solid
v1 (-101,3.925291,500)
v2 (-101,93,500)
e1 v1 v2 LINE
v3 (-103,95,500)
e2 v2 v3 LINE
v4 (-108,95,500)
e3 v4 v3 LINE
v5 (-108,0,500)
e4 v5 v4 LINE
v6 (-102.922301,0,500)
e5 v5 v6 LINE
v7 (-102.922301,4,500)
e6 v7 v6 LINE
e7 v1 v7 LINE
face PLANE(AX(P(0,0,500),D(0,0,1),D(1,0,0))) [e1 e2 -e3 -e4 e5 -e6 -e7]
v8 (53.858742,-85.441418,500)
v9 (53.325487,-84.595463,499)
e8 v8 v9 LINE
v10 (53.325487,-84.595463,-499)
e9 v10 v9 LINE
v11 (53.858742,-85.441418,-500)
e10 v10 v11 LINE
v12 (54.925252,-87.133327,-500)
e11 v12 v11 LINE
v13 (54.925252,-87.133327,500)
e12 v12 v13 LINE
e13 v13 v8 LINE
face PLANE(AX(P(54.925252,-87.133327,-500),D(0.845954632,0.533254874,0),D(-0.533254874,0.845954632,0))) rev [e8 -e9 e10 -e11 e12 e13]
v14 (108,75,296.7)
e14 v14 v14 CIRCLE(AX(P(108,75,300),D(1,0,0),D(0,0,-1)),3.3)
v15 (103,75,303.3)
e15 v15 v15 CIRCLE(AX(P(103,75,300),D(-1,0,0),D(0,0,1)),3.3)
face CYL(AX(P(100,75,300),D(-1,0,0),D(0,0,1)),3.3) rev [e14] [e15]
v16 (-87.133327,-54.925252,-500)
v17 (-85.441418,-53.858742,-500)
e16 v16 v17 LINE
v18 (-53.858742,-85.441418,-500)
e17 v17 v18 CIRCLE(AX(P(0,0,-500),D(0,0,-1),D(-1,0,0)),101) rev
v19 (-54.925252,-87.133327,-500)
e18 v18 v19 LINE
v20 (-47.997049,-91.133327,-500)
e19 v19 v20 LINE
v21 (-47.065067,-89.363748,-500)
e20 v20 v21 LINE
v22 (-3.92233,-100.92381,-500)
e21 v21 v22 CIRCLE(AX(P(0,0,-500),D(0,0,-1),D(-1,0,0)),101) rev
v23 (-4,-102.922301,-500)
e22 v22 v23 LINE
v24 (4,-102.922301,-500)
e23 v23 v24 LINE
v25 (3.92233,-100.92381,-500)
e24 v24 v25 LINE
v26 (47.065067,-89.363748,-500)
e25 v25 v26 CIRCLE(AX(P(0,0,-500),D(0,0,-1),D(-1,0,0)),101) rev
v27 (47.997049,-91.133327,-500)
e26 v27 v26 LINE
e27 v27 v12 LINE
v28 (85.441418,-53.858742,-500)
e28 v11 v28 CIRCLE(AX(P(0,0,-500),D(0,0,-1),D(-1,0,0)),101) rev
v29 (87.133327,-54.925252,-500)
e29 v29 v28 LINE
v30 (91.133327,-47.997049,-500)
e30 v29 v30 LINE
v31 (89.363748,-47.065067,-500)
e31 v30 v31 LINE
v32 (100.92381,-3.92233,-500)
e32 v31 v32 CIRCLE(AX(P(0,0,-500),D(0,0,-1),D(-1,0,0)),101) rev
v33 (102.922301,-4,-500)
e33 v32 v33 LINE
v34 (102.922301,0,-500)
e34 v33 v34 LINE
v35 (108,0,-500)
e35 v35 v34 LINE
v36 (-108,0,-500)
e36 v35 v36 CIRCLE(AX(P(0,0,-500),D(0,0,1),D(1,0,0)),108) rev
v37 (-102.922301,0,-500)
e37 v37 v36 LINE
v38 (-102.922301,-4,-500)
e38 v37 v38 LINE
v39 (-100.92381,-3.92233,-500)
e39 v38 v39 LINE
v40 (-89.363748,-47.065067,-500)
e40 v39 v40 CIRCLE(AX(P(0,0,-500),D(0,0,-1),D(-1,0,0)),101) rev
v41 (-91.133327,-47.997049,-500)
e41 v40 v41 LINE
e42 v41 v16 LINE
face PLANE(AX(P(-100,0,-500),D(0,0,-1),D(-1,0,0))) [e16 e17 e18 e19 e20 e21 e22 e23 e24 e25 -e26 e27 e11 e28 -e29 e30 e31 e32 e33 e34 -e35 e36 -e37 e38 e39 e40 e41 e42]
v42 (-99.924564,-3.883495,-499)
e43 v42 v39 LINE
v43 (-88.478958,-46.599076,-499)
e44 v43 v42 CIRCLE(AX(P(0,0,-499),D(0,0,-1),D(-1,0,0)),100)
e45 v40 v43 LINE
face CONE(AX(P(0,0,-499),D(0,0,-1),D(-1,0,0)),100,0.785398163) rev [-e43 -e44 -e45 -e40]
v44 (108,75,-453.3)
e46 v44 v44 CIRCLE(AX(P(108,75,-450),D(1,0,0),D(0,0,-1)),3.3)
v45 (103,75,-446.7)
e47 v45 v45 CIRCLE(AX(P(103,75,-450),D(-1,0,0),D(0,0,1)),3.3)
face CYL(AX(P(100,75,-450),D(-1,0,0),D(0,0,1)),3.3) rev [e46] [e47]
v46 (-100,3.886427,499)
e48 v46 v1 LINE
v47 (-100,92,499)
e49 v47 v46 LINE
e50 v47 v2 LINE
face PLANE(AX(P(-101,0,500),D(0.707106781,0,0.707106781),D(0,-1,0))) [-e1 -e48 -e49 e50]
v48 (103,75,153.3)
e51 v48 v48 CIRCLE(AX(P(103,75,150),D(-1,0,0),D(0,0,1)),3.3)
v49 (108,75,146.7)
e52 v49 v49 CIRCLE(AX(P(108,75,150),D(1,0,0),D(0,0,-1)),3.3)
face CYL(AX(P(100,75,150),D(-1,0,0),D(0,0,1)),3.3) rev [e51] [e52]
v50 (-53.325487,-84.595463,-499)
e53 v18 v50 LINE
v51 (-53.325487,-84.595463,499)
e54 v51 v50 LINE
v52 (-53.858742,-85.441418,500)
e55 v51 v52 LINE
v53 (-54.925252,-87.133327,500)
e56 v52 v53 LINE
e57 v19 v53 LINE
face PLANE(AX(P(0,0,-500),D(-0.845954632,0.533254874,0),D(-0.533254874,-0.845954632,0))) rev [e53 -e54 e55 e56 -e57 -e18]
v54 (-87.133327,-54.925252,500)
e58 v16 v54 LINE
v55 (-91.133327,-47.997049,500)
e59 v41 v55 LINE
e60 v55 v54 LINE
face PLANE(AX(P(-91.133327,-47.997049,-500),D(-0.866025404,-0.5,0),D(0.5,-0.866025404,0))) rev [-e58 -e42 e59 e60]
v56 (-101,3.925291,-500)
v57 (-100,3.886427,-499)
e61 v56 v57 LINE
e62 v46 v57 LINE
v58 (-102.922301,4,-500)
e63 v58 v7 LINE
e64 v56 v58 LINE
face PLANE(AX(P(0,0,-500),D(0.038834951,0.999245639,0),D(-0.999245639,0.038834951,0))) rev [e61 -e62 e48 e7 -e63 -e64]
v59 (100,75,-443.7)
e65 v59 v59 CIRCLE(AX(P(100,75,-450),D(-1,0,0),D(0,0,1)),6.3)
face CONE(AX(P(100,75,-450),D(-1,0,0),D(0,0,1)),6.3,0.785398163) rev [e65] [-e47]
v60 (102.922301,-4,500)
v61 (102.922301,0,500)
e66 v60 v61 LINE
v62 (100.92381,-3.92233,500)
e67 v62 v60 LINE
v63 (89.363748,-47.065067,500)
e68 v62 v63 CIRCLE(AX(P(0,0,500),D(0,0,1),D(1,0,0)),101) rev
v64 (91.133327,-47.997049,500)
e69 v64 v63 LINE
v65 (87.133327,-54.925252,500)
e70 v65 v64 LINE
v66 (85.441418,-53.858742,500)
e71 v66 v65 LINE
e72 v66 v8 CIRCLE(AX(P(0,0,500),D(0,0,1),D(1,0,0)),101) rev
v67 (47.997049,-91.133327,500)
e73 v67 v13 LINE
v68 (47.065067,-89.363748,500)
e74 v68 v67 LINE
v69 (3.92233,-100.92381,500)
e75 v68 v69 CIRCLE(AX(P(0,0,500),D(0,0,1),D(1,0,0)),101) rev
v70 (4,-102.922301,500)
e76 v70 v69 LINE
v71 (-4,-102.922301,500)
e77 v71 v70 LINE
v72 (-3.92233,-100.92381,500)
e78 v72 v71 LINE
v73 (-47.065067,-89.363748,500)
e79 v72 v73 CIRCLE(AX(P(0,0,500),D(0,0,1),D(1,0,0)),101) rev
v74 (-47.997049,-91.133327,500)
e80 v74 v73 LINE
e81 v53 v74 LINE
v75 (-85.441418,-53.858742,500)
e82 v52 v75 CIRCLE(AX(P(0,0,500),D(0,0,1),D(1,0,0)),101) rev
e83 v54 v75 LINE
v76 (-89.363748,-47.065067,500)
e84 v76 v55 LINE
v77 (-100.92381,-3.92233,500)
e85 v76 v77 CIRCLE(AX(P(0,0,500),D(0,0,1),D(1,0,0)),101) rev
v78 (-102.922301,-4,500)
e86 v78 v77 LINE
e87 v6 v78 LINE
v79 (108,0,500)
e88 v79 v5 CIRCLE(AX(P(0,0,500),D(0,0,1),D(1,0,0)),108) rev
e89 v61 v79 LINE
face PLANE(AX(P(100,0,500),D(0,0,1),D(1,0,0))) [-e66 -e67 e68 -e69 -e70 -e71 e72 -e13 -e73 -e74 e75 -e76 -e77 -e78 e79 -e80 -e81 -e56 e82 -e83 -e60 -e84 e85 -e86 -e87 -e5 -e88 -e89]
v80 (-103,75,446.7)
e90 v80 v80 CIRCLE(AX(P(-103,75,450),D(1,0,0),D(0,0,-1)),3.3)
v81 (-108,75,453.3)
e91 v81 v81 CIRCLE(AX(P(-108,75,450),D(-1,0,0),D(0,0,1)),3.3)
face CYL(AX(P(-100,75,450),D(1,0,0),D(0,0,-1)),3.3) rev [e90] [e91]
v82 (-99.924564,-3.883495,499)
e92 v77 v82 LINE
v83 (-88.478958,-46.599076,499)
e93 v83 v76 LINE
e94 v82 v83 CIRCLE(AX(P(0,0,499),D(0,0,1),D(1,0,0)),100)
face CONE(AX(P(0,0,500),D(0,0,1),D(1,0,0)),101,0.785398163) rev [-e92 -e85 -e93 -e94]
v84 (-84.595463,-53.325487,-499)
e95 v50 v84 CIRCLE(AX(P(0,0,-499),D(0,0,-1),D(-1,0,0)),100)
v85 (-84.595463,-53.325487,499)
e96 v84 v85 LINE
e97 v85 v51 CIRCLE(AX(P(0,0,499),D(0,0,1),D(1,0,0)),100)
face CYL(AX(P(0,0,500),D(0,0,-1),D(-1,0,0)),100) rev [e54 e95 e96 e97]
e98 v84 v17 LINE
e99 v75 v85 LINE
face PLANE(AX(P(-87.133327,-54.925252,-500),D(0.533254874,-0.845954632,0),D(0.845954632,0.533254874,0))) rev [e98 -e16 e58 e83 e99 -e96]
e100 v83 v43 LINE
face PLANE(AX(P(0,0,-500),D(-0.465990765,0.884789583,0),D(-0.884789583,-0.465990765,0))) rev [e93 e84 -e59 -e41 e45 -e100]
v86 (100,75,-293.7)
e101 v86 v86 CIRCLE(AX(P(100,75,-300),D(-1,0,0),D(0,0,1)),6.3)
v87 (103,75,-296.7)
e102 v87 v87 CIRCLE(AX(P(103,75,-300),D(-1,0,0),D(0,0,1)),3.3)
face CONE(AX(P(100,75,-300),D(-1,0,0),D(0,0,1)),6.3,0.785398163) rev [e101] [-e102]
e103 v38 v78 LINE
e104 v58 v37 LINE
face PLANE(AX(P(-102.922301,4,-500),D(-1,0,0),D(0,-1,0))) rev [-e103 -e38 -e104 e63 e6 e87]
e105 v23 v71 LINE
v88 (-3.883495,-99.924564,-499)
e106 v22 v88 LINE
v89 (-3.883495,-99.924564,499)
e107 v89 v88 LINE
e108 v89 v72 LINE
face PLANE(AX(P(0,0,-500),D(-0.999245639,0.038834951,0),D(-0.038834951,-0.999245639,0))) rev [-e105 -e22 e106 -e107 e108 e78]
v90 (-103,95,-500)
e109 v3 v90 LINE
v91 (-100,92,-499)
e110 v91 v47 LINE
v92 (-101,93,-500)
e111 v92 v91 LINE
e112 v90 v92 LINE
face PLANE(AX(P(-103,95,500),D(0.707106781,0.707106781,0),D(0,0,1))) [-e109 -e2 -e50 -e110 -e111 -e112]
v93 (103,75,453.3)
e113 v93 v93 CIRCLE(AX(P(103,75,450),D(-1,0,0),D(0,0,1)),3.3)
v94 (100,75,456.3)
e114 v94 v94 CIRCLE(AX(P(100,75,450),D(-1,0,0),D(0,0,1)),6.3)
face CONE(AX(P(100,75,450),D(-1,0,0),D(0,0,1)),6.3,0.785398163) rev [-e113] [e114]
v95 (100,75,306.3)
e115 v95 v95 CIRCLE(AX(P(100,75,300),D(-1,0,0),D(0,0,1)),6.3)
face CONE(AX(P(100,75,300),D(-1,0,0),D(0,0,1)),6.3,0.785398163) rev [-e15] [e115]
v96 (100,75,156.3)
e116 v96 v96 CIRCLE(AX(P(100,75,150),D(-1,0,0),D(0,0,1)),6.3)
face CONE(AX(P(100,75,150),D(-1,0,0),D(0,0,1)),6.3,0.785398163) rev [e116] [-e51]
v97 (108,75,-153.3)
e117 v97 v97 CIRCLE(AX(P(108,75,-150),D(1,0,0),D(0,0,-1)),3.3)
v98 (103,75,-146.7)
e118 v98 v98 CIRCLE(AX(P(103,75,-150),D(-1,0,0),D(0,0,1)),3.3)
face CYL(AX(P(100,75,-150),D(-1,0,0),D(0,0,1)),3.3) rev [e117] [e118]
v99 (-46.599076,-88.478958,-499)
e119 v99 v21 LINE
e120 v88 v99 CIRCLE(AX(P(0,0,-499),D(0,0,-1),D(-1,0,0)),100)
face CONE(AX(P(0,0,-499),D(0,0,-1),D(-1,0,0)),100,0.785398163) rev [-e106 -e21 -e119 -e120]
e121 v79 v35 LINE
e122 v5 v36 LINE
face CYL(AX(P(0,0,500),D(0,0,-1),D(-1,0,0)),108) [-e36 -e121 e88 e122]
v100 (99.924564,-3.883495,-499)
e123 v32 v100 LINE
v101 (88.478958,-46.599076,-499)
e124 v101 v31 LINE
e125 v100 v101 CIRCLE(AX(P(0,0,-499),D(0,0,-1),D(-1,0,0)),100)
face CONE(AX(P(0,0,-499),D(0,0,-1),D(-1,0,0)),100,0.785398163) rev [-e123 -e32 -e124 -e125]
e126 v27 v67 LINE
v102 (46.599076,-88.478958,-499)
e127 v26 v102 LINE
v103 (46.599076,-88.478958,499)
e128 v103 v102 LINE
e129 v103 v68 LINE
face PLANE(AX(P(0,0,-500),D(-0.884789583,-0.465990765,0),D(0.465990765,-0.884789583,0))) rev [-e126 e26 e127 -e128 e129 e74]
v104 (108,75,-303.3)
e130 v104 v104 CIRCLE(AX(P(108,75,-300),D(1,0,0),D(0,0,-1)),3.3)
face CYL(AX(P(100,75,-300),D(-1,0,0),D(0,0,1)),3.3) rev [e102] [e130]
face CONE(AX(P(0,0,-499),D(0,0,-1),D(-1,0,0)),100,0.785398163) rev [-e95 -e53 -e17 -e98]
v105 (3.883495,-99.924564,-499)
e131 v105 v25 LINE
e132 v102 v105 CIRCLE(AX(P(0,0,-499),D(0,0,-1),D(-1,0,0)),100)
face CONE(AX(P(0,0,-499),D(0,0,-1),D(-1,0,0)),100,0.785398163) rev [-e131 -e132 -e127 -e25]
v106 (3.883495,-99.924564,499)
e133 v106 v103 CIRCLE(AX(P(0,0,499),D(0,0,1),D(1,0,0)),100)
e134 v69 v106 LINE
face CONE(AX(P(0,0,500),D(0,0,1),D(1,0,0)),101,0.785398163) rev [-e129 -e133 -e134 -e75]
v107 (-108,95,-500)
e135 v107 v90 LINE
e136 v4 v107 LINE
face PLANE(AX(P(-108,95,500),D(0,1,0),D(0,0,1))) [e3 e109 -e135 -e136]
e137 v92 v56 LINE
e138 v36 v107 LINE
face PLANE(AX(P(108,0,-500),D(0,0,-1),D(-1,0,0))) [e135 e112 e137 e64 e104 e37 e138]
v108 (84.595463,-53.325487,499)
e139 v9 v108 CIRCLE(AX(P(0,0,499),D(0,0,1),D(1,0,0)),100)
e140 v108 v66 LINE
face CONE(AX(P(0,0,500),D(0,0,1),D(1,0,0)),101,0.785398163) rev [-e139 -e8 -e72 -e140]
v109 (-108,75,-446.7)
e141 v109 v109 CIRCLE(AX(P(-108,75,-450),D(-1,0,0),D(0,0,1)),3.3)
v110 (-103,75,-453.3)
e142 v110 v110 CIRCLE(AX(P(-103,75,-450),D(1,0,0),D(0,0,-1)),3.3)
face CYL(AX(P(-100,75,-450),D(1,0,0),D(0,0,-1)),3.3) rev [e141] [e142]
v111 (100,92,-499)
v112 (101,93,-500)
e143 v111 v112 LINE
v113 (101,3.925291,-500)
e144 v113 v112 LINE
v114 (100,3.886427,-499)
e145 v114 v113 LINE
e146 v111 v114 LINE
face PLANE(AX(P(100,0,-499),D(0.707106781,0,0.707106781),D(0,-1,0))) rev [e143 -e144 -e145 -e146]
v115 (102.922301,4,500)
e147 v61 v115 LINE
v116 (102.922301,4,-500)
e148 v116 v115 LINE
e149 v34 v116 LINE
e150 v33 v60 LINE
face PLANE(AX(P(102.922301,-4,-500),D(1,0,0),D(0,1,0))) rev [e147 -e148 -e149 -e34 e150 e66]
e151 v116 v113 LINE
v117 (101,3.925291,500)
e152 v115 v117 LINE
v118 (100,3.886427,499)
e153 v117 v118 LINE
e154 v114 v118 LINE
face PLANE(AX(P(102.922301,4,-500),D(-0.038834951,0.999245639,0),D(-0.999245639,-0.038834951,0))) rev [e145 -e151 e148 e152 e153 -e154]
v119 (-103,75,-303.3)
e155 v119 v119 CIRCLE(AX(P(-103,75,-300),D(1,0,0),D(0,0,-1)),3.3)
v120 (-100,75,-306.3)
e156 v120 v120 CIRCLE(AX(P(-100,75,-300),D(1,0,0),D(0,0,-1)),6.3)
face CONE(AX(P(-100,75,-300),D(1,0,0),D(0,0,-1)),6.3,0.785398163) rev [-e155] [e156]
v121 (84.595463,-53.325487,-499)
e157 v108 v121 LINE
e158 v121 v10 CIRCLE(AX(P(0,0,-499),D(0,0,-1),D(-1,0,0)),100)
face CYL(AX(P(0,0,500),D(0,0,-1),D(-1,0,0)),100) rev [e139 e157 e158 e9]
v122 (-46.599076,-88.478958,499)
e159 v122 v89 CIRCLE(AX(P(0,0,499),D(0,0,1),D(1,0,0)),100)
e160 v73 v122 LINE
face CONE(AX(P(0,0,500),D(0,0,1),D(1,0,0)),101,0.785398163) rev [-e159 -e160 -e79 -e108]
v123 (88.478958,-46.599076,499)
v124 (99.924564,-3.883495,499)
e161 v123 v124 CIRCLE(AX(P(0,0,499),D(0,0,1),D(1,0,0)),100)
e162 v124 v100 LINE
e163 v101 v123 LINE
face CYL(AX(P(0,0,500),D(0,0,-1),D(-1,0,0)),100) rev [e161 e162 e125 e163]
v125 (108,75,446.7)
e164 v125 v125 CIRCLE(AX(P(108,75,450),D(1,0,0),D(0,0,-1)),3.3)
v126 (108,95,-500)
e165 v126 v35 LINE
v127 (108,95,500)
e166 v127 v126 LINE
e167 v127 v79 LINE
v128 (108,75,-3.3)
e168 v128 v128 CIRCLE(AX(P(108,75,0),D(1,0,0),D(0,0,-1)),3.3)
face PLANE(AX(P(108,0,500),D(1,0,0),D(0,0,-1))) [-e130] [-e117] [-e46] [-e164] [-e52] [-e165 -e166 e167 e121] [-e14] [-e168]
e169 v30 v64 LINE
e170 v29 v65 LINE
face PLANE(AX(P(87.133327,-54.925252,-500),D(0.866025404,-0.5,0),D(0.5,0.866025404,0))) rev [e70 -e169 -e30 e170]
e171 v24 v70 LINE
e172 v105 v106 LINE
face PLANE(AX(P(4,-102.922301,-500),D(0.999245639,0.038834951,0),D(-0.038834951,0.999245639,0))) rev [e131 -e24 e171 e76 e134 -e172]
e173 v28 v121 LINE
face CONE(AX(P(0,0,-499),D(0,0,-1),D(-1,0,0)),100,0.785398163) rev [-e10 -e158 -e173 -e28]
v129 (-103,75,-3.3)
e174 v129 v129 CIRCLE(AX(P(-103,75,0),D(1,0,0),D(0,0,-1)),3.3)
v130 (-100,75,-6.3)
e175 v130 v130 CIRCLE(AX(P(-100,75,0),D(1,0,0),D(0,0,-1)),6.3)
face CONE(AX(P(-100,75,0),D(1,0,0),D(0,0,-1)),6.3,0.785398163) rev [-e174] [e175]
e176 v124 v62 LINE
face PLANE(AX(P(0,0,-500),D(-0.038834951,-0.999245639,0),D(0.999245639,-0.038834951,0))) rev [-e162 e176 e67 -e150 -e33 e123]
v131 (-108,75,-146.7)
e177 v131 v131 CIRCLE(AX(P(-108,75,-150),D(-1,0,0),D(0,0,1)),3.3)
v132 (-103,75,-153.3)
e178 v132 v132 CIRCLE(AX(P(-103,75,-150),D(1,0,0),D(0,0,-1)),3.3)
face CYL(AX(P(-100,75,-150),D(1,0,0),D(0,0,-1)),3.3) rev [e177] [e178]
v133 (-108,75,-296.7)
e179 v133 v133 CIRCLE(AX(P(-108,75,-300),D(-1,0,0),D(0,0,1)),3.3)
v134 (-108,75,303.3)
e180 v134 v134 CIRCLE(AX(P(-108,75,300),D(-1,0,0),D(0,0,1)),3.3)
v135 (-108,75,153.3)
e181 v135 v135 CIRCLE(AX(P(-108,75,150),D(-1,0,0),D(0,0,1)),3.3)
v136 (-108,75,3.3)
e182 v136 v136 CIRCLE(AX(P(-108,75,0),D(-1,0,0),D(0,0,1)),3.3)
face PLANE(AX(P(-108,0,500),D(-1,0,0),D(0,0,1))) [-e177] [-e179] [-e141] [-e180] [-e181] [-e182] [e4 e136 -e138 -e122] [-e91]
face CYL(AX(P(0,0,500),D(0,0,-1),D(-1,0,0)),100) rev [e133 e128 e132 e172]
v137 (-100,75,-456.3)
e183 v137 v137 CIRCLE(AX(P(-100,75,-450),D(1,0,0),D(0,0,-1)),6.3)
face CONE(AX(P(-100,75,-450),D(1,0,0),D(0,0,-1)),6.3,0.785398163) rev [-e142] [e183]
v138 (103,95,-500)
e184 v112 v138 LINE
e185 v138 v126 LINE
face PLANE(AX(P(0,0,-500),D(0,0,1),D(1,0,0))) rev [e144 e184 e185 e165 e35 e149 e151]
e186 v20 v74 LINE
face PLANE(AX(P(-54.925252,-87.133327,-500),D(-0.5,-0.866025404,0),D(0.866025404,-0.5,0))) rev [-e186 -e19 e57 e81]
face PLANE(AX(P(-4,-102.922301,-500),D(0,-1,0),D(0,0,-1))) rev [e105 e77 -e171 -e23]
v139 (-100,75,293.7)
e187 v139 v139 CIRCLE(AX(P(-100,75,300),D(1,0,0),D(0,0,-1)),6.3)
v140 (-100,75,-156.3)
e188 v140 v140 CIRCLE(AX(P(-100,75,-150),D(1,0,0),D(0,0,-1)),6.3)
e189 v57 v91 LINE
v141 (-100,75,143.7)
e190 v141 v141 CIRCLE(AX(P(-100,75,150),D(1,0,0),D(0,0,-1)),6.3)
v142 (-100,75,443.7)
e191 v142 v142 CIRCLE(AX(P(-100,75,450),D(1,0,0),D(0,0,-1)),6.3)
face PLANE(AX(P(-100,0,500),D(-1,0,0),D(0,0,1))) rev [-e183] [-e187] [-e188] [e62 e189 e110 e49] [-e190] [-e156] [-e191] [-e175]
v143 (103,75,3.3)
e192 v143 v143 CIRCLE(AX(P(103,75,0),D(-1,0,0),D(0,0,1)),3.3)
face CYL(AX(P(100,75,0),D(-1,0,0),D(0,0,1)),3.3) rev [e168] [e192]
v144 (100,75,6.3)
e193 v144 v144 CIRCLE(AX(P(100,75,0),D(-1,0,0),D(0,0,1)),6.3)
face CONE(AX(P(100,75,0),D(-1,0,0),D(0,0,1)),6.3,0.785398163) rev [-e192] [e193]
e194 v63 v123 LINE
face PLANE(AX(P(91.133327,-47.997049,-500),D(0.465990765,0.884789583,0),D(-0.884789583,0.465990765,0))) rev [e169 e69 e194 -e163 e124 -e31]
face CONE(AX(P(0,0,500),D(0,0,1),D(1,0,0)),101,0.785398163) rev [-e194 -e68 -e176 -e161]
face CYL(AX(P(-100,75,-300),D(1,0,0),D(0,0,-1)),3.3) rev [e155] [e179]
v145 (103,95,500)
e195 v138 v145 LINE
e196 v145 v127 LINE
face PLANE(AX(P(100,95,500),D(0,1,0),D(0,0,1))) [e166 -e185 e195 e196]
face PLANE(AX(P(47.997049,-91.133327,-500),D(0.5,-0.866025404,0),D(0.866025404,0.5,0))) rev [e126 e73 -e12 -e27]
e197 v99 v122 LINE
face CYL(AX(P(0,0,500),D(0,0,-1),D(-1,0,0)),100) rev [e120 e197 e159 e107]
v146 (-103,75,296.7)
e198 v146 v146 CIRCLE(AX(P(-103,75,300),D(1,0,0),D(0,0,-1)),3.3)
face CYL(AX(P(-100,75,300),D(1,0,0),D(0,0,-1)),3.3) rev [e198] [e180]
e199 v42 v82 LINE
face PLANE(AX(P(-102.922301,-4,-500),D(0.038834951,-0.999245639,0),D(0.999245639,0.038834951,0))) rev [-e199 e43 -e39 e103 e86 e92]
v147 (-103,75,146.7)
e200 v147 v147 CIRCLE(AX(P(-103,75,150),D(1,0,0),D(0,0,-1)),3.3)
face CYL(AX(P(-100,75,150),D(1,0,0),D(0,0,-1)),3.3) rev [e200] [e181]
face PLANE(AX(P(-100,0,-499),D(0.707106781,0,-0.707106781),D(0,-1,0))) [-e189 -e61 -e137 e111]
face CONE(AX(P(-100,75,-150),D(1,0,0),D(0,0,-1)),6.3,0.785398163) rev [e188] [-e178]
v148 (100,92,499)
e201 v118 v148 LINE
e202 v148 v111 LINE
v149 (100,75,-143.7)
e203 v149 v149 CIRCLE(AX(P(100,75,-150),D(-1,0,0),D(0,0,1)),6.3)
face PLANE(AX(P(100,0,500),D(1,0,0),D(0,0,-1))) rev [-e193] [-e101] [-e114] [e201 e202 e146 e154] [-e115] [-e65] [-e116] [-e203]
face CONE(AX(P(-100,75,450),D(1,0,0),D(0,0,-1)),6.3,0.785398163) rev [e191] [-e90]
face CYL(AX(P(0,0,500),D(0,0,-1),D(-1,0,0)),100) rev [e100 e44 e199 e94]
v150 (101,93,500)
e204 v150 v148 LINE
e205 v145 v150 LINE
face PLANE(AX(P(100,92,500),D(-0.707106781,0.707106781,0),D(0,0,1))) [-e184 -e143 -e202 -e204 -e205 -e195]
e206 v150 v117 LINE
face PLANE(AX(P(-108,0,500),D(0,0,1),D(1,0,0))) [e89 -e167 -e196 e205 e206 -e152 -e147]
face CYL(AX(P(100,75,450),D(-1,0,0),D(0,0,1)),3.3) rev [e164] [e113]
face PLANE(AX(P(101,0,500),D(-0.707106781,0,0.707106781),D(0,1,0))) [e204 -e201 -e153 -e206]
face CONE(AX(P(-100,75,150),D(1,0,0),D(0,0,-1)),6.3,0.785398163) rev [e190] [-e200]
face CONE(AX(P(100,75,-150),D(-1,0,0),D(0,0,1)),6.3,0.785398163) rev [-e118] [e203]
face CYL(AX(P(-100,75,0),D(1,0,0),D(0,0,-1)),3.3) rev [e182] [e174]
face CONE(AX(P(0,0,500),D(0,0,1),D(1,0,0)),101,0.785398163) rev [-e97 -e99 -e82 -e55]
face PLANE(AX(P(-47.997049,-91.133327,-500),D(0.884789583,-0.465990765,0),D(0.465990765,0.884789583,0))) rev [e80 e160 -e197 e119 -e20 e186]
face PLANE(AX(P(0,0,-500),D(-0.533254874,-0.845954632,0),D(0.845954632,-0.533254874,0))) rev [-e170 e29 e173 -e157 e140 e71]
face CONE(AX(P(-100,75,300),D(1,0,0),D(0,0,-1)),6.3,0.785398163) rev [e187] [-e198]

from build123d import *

# Parameters (mm, degrees)
SM_BASE_FLANGE_1_DEPTH     = 500
CHAMFER_2_SIZE             = 1
CUT_EXTRUDE_1_DEPTH        = 1012.596757607
PATTERN_CIRCULAR_1_COUNT   = 4
PATTERN_CIRCULAR_1_ANGLE   = 90
F_1_THE_OTHER_WAY_COUNT    = 4
F_1_THE_OTHER_WAY_ANGLE    = 90
CHAMFER_1_SIZE             = 3
HOLE_WIZARD_M61_AT_2_COUNT = 2
HOLE_WIZARD_M61_AT_2_PITCH = 150
HOLE_WIZARD_M61_AT_3_COUNT = 2
HOLE_WIZARD_M61_AT_3_PITCH = 300
HOLE_WIZARD_M61_AT_4_COUNT = 2
HOLE_WIZARD_M61_AT_4_PITCH = 450
HOLE_WIZARD_M61_AT_5_COUNT = 2
HOLE_WIZARD_M61_AT_5_PITCH = 600
HOLE_WIZARD_M61_AT_6_COUNT = 2
HOLE_WIZARD_M61_AT_6_PITCH = 750
HOLE_WIZARD_M61_AT_7_COUNT = 2
HOLE_WIZARD_M61_AT_7_PITCH = 900


# Sheet-metal steps are written as plain solids
with BuildPart() as part:
    # Sketch 2 → Базовая кромка1 (new, symmetric)
    with BuildSketch(Plane.XY):
        with BuildLine():
            Line((100, 95), (100, 0))
            ThreePointArc((100, 0), (0, -100), (-100, 0))
            Line((-100, 0), (-100, 95))
            Line((-100, 95), (-108, 95))
            Line((-108, 95), (-108, 0))
            ThreePointArc((-108, 0), (0, -108), (108, 0))
            Line((108, 0), (108, 95))
            Line((108, 95), (100, 95))
        make_face()
    extrude(amount=SM_BASE_FLANGE_1_DEPTH, both=True)

    # Фаска2
    chamfer_2_edges = [part.edges().sort_by_distance(p)[0] for p in [
        (100, 47.5, 500),
        (0, -100, 500),
        (-100, 47.5, 500),
        (0, -100, -500),
        (100, 47.5, -500),
        (-100, 47.5, -500),
    ]]
    chamfer(chamfer_2_edges, length=CHAMFER_2_SIZE)

    # Эскиз7 → Вырез-Вытянуть1 (cut, symmetric)
    with BuildSketch(Plane.XY.offset(500)):
        Polygon((0, 0), (-4, -102.92230079), (4, -102.92230079), align=None)
    cut_extrude_1 = extrude(amount=CUT_EXTRUDE_1_DEPTH, both=True, mode=Mode.SUBTRACT)

    # Круговой массив1: Вырез-Вытянуть1 ×4 about axis
    pattern_circular_1_axis = Axis((0, 0, 0), (0, 0, -1))
    for i in range(1, PATTERN_CIRCULAR_1_COUNT):
        add(cut_extrude_1.rotate(pattern_circular_1_axis, i * PATTERN_CIRCULAR_1_ANGLE / (PATTERN_CIRCULAR_1_COUNT - 1)), mode=Mode.SUBTRACT)

    # 1 the other way: Вырез-Вытянуть1 ×4 about axis
    f_1_the_other_way_axis = Axis((0, 0, 0), (0, 0, 1))
    for i in range(1, F_1_THE_OTHER_WAY_COUNT):
        add(cut_extrude_1.rotate(f_1_the_other_way_axis, i * F_1_THE_OTHER_WAY_ANGLE / (F_1_THE_OTHER_WAY_COUNT - 1)), mode=Mode.SUBTRACT)

    # Фаска1
    chamfer_1_edges = [part.edges().sort_by_distance(p)[0] for p in [
        (100, 95, 0),
        (-100, 95, 0),
    ]]
    chamfer(chamfer_1_edges, length=CHAMFER_1_SIZE)

    # Эскиз9 → Зенковка для винта с полупотайной головкой M61 (revolve, cut)
    with BuildSketch(Plane(origin=(-100, 75, 450), x_dir=(0, 0, -1), z_dir=(0, 1, 0))):
        Polygon((0, 0), (0, 18.982840043), (3.3, 17), (3.3, 3), (6.3, 0), align=None)
    hole_wizard_m61 = revolve(axis=Axis((-93.65, 75, 450), (-1, 0, 0)), mode=Mode.SUBTRACT)

    # Зенковка для винта с полупотайной головкой M61 at 2: Зенковка для винта с полупотайной головкой M61 ×2
    with Locations(*[(0, 0, -i * HOLE_WIZARD_M61_AT_2_PITCH) for i in range(1, HOLE_WIZARD_M61_AT_2_COUNT)]):
        add(hole_wizard_m61, mode=Mode.SUBTRACT)

    # Зенковка для винта с полупотайной головкой M61 at 3: Зенковка для винта с полупотайной головкой M61 ×2
    with Locations(*[(0, 0, -i * HOLE_WIZARD_M61_AT_3_PITCH) for i in range(1, HOLE_WIZARD_M61_AT_3_COUNT)]):
        add(hole_wizard_m61, mode=Mode.SUBTRACT)

    # Зенковка для винта с полупотайной головкой M61 at 4: Зенковка для винта с полупотайной головкой M61 ×2
    with Locations(*[(0, 0, -i * HOLE_WIZARD_M61_AT_4_PITCH) for i in range(1, HOLE_WIZARD_M61_AT_4_COUNT)]):
        add(hole_wizard_m61, mode=Mode.SUBTRACT)

    # Зенковка для винта с полупотайной головкой M61 at 5: Зенковка для винта с полупотайной головкой M61 ×2
    with Locations(*[(0, 0, -i * HOLE_WIZARD_M61_AT_5_PITCH) for i in range(1, HOLE_WIZARD_M61_AT_5_COUNT)]):
        add(hole_wizard_m61, mode=Mode.SUBTRACT)

    # Зенковка для винта с полупотайной головкой M61 at 6: Зенковка для винта с полупотайной головкой M61 ×2
    with Locations(*[(0, 0, -i * HOLE_WIZARD_M61_AT_6_PITCH) for i in range(1, HOLE_WIZARD_M61_AT_6_COUNT)]):
        add(hole_wizard_m61, mode=Mode.SUBTRACT)

    # Зенковка для винта с полупотайной головкой M61 at 7: Зенковка для винта с полупотайной головкой M61 ×2
    with Locations(*[(0, 0, -i * HOLE_WIZARD_M61_AT_7_PITCH) for i in range(1, HOLE_WIZARD_M61_AT_7_COUNT)]):
        add(hole_wizard_m61, mode=Mode.SUBTRACT)

    # Зеркальное отражение1: Зенковка для винта с полупотайной головкой M61 across plane
    add(hole_wizard_m61.mirror(Plane(origin=(0, 0, 0), x_dir=(0, 0, 1), z_dir=(1, 0, 0))), mode=Mode.SUBTRACT)

    # Зеркальное отражение1 copy 1 sketch → Зеркальное отражение1 copy 1 (revolve, cut)
    with BuildSketch(Plane(origin=(100, 75, 300), x_dir=(0, 0, -1), z_dir=(0, 1, 0))):
        Polygon((0, 0), (0, -18.982840043), (3.3, -17), (3.3, -3), (6.3, 0), align=None)
    revolve(axis=Axis((93.65, 75, 300), (-1, 0, 0)), mode=Mode.SUBTRACT)

    # Зеркальное отражение1 copy 2 sketch → Зеркальное отражение1 copy 2 (revolve, cut)
    with BuildSketch(Plane(origin=(100, 75, 150), x_dir=(0, 0, -1), z_dir=(0, 1, 0))):
        Polygon((0, 0), (0, -18.982840043), (3.3, -17), (3.3, -3), (6.3, 0), align=None)
    revolve(axis=Axis((93.65, 75, 150), (-1, 0, 0)), mode=Mode.SUBTRACT)

    # Зеркальное отражение1 copy 3 sketch → Зеркальное отражение1 copy 3 (revolve, cut)
    with BuildSketch(Plane(origin=(100, 75, 0), x_dir=(0, 0, -1), z_dir=(0, 1, 0))):
        Polygon((0, 0), (0, -18.982840043), (3.3, -17), (3.3, -3), (6.3, 0), align=None)
    revolve(axis=Axis((93.65, 75, 0), (-1, 0, 0)), mode=Mode.SUBTRACT)

    # Зеркальное отражение1 copy 4 sketch → Зеркальное отражение1 copy 4 (revolve, cut)
    with BuildSketch(Plane(origin=(100, 75, -150), x_dir=(0, 0, -1), z_dir=(0, 1, 0))):
        Polygon((0, 0), (0, -18.982840043), (3.3, -17), (3.3, -3), (6.3, 0), align=None)
    revolve(axis=Axis((93.65, 75, -150), (-1, 0, 0)), mode=Mode.SUBTRACT)

    # Зеркальное отражение1 copy 5 sketch → Зеркальное отражение1 copy 5 (revolve, cut)
    with BuildSketch(Plane(origin=(100, 75, -300), x_dir=(0, 0, -1), z_dir=(0, 1, 0))):
        Polygon((0, 0), (0, -18.982840043), (3.3, -17), (3.3, -3), (6.3, 0), align=None)
    revolve(axis=Axis((93.65, 75, -300), (-1, 0, 0)), mode=Mode.SUBTRACT)

    # Зеркальное отражение1 copy 6 sketch → Зеркальное отражение1 copy 6 (revolve, cut)
    with BuildSketch(Plane(origin=(100, 75, -450), x_dir=(0, 0, -1), z_dir=(0, 1, 0))):
        Polygon((0, 0), (0, -18.982840043), (3.3, -17), (3.3, -3), (6.3, 0), align=None)
    revolve(axis=Axis((93.65, 75, -450), (-1, 0, 0)), mode=Mode.SUBTRACT)


solid = part.part
